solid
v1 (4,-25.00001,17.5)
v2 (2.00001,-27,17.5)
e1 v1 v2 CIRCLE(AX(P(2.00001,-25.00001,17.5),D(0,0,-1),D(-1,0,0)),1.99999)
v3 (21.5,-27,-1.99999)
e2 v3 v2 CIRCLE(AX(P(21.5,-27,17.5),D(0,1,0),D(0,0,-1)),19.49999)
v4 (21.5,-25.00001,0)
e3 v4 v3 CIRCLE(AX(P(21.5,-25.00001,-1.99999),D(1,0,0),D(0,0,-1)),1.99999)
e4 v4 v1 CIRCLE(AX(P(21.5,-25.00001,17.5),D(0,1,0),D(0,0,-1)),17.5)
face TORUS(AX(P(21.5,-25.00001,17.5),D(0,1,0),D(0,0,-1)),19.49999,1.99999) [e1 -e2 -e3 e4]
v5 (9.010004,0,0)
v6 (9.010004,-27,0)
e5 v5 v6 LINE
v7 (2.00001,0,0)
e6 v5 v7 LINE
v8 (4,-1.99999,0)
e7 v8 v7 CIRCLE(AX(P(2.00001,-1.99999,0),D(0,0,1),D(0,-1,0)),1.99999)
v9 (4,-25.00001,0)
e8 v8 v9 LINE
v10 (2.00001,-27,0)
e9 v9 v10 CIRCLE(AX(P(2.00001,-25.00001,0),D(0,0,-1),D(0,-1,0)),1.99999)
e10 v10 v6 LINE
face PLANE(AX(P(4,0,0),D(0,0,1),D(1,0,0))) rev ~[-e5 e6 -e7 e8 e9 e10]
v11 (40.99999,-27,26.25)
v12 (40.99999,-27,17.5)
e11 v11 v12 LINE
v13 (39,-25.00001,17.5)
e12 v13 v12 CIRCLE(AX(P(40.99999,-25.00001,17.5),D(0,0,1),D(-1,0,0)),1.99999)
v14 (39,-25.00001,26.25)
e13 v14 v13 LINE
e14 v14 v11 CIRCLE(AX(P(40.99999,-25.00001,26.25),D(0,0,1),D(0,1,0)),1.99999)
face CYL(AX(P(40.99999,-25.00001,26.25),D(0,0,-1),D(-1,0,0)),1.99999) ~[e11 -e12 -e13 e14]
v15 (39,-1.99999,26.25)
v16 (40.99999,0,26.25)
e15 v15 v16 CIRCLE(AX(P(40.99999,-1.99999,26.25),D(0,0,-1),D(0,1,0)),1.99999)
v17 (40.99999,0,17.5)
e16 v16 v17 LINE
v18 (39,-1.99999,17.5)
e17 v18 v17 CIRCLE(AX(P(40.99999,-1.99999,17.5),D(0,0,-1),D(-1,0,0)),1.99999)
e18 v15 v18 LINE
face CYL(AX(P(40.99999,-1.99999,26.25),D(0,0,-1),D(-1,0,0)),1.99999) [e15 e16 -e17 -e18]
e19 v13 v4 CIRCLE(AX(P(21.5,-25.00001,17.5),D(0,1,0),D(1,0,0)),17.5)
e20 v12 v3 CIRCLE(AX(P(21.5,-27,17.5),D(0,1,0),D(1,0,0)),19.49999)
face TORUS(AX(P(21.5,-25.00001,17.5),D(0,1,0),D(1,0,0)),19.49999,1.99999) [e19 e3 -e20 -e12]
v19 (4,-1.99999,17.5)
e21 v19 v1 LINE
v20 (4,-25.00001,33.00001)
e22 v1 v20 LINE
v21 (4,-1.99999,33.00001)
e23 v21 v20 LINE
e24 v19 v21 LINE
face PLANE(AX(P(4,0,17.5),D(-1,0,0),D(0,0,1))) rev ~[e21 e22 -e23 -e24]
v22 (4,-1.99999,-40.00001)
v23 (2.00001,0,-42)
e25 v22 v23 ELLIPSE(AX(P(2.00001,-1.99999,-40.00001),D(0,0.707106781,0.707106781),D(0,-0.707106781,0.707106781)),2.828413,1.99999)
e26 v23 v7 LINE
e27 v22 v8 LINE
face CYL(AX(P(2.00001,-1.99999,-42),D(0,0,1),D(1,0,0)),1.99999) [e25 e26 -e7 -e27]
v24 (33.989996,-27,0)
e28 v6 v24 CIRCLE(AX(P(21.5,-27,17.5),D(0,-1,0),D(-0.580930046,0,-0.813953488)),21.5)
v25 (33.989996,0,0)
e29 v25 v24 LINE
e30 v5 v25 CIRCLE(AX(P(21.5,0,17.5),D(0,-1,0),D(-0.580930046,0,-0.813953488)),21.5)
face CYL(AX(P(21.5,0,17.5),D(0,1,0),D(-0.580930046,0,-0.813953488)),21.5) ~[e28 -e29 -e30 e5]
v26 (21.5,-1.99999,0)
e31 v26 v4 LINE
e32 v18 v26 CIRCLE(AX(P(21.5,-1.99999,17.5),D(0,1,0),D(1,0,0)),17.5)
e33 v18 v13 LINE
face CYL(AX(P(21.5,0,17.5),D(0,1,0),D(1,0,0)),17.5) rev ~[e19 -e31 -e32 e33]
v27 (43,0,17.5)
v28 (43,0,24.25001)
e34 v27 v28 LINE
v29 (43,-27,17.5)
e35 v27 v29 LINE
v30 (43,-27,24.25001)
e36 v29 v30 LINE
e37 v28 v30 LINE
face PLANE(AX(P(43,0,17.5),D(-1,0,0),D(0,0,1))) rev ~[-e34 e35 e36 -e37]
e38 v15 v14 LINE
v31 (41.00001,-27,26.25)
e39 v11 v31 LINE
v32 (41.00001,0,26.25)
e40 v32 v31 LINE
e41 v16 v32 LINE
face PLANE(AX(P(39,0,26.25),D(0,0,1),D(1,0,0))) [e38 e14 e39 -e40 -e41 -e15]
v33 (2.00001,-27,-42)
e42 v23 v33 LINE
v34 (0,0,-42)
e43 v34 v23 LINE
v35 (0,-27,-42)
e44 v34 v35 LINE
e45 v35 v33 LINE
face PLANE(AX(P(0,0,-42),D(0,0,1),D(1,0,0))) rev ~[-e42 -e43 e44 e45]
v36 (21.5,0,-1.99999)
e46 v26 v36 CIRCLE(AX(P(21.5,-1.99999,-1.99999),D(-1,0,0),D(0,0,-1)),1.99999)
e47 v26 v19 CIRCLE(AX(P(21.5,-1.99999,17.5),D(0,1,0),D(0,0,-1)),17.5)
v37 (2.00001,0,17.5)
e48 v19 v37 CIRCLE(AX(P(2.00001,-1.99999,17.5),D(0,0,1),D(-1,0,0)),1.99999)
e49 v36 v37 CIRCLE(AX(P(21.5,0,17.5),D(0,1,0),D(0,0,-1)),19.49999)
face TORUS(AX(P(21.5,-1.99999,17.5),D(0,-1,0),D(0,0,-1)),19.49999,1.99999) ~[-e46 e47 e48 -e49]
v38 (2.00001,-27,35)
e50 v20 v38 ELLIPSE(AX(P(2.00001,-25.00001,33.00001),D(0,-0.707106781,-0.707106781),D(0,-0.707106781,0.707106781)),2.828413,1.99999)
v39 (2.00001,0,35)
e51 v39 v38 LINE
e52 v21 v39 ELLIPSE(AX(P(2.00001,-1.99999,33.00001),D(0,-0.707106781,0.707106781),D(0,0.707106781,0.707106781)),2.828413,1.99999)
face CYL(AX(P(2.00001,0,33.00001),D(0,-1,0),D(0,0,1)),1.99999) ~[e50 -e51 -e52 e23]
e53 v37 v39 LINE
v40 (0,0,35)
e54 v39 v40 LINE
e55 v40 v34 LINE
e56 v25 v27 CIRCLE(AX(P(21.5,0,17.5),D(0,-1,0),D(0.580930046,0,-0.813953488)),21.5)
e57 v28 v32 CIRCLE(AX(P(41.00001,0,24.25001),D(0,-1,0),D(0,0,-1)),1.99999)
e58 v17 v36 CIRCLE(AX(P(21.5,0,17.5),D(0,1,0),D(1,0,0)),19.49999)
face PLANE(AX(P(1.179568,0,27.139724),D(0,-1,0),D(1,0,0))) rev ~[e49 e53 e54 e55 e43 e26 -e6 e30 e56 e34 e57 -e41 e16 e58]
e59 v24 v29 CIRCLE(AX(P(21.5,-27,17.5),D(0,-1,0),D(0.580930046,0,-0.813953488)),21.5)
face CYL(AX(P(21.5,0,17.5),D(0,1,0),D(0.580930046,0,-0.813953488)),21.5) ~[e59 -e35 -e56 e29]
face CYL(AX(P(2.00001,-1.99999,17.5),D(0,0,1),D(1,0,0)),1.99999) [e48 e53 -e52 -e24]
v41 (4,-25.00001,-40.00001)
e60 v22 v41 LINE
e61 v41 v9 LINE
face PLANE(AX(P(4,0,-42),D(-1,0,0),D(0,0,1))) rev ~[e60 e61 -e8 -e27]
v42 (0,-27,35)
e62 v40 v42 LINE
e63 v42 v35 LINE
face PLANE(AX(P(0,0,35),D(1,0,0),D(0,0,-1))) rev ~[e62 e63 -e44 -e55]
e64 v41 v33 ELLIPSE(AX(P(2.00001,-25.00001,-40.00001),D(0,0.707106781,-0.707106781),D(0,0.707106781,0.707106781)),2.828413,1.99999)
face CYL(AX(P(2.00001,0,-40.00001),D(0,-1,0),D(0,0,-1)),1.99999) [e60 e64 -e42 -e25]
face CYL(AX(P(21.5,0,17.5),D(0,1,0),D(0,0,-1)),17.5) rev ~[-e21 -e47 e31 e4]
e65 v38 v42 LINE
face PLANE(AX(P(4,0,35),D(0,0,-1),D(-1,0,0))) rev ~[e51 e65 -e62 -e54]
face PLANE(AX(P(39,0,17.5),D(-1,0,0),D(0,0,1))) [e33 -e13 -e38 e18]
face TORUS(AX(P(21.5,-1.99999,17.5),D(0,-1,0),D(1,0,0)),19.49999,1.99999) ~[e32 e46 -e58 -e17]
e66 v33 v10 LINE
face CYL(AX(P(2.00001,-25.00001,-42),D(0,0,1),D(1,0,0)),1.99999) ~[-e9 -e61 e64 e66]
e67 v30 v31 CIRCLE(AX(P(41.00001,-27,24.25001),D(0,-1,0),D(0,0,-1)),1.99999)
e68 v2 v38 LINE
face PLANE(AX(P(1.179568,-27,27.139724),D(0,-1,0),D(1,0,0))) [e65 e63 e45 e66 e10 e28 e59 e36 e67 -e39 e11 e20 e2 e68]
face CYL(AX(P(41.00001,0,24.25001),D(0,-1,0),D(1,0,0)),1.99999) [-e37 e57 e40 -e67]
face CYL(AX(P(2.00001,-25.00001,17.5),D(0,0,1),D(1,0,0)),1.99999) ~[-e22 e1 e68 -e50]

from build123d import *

# Parameters (mm, degrees)
F1_W     = 4
F1_H     = 42
F1_H_2   = 8.75
F2_DEPTH = 27
F3_R     = 1.99999


# Not quite as in the source:
# - a fillet or chamfer is up to 0.001 mm smaller than in the source, because OpenCascade refuses the exact size


with BuildPart() as f2:
    # F1 (on Front) → F2 (new body)
    with BuildSketch(Plane.XZ):
        with BuildLine():
            Line((4, 35), (0, 35))
            Line((0, 35), (0, 17.5))
            ThreePointArc((0, 17.5), (1.0244047706, 24.0574385243), (4, 29.9899959968))
            Line((4, 29.9899959968), (4, 35))
        make_face()
        with BuildLine():
            ThreePointArc((4, 5.0100040032), (1.0244047706, 10.9425614757), (0, 17.5))
            Line((0, 17.5), (0, 0))
            Line((0, 0), (4, 0))
            Line((4, 0), (4, 5.0100040032))
        make_face()
        with BuildLine():
            Line((4, 17.5), (0, 17.5))
            ThreePointArc((0, 17.5), (1.0244047706, 10.9425614757), (4, 5.0100040032))
            Line((4, 5.0100040032), (4, 17.5))
        make_face()
        with BuildLine():
            ThreePointArc((4, 29.9899959968), (1.0244047706, 24.0574385243), (0, 17.5))
            Line((0, 17.5), (4, 17.5))
            Line((4, 17.5), (4, 29.9899959968))
        make_face()
        with Locations((2, -21)):
            Rectangle(F1_W, F1_H)
        with BuildLine():
            ThreePointArc((9.0100040032, 0), (6.2972042045, 2.2972042045), (4, 5.0100040032))
            Line((4, 5.0100040032), (4, 0))
            Line((4, 0), (9.0100040032, 0))
        make_face()
        with BuildLine():
            Line((4, 17.5), (4, 5.0100040032))
            ThreePointArc((4, 5.0100040032), (6.2972042045, 2.2972042045), (9.0100040032, 0))
            Line((9.0100040032, 0), (21.5, 0))
            ThreePointArc((21.5, 0), (9.1256313292, 5.1256313292), (4, 17.5))
        make_face()
        with BuildLine():
            Line((21.5, 0), (9.0100040032, 0))
            ThreePointArc((9.0100040032, 0), (21.5, -4), (33.9899959968, 0))
            Line((33.9899959968, 0), (21.5, 0))
        make_face()
        with BuildLine():
            ThreePointArc((39, 17.5), (33.8743686708, 5.1256313292), (21.5, 0))
            Line((21.5, 0), (33.9899959968, 0))
            ThreePointArc((33.9899959968, 0), (40.6152414833, 7.6583770122), (43, 17.5))
            Line((43, 17.5), (39, 17.5))
        make_face()
        with Locations((41, 21.875)):
            Rectangle(F1_W, F1_H_2)
    extrude(amount=F2_DEPTH)

    # F3 (radius 2 in the source; OpenCascade refuses exactly that, so slightly less here)
    f3_edges = [f2.edges().sort_by_distance(p)[0] for p in [
        (4, -27, -21),
        (4, -27, 26.25),
        (4, 0, -21),
        (4, -13.5, -42),
        (4, 0, 26.25),
        (43, -13.5, 26.25),
        (4, -13.5, 35),
    ]]
    fillet(f3_edges, radius=F3_R)


solid = f2.part
